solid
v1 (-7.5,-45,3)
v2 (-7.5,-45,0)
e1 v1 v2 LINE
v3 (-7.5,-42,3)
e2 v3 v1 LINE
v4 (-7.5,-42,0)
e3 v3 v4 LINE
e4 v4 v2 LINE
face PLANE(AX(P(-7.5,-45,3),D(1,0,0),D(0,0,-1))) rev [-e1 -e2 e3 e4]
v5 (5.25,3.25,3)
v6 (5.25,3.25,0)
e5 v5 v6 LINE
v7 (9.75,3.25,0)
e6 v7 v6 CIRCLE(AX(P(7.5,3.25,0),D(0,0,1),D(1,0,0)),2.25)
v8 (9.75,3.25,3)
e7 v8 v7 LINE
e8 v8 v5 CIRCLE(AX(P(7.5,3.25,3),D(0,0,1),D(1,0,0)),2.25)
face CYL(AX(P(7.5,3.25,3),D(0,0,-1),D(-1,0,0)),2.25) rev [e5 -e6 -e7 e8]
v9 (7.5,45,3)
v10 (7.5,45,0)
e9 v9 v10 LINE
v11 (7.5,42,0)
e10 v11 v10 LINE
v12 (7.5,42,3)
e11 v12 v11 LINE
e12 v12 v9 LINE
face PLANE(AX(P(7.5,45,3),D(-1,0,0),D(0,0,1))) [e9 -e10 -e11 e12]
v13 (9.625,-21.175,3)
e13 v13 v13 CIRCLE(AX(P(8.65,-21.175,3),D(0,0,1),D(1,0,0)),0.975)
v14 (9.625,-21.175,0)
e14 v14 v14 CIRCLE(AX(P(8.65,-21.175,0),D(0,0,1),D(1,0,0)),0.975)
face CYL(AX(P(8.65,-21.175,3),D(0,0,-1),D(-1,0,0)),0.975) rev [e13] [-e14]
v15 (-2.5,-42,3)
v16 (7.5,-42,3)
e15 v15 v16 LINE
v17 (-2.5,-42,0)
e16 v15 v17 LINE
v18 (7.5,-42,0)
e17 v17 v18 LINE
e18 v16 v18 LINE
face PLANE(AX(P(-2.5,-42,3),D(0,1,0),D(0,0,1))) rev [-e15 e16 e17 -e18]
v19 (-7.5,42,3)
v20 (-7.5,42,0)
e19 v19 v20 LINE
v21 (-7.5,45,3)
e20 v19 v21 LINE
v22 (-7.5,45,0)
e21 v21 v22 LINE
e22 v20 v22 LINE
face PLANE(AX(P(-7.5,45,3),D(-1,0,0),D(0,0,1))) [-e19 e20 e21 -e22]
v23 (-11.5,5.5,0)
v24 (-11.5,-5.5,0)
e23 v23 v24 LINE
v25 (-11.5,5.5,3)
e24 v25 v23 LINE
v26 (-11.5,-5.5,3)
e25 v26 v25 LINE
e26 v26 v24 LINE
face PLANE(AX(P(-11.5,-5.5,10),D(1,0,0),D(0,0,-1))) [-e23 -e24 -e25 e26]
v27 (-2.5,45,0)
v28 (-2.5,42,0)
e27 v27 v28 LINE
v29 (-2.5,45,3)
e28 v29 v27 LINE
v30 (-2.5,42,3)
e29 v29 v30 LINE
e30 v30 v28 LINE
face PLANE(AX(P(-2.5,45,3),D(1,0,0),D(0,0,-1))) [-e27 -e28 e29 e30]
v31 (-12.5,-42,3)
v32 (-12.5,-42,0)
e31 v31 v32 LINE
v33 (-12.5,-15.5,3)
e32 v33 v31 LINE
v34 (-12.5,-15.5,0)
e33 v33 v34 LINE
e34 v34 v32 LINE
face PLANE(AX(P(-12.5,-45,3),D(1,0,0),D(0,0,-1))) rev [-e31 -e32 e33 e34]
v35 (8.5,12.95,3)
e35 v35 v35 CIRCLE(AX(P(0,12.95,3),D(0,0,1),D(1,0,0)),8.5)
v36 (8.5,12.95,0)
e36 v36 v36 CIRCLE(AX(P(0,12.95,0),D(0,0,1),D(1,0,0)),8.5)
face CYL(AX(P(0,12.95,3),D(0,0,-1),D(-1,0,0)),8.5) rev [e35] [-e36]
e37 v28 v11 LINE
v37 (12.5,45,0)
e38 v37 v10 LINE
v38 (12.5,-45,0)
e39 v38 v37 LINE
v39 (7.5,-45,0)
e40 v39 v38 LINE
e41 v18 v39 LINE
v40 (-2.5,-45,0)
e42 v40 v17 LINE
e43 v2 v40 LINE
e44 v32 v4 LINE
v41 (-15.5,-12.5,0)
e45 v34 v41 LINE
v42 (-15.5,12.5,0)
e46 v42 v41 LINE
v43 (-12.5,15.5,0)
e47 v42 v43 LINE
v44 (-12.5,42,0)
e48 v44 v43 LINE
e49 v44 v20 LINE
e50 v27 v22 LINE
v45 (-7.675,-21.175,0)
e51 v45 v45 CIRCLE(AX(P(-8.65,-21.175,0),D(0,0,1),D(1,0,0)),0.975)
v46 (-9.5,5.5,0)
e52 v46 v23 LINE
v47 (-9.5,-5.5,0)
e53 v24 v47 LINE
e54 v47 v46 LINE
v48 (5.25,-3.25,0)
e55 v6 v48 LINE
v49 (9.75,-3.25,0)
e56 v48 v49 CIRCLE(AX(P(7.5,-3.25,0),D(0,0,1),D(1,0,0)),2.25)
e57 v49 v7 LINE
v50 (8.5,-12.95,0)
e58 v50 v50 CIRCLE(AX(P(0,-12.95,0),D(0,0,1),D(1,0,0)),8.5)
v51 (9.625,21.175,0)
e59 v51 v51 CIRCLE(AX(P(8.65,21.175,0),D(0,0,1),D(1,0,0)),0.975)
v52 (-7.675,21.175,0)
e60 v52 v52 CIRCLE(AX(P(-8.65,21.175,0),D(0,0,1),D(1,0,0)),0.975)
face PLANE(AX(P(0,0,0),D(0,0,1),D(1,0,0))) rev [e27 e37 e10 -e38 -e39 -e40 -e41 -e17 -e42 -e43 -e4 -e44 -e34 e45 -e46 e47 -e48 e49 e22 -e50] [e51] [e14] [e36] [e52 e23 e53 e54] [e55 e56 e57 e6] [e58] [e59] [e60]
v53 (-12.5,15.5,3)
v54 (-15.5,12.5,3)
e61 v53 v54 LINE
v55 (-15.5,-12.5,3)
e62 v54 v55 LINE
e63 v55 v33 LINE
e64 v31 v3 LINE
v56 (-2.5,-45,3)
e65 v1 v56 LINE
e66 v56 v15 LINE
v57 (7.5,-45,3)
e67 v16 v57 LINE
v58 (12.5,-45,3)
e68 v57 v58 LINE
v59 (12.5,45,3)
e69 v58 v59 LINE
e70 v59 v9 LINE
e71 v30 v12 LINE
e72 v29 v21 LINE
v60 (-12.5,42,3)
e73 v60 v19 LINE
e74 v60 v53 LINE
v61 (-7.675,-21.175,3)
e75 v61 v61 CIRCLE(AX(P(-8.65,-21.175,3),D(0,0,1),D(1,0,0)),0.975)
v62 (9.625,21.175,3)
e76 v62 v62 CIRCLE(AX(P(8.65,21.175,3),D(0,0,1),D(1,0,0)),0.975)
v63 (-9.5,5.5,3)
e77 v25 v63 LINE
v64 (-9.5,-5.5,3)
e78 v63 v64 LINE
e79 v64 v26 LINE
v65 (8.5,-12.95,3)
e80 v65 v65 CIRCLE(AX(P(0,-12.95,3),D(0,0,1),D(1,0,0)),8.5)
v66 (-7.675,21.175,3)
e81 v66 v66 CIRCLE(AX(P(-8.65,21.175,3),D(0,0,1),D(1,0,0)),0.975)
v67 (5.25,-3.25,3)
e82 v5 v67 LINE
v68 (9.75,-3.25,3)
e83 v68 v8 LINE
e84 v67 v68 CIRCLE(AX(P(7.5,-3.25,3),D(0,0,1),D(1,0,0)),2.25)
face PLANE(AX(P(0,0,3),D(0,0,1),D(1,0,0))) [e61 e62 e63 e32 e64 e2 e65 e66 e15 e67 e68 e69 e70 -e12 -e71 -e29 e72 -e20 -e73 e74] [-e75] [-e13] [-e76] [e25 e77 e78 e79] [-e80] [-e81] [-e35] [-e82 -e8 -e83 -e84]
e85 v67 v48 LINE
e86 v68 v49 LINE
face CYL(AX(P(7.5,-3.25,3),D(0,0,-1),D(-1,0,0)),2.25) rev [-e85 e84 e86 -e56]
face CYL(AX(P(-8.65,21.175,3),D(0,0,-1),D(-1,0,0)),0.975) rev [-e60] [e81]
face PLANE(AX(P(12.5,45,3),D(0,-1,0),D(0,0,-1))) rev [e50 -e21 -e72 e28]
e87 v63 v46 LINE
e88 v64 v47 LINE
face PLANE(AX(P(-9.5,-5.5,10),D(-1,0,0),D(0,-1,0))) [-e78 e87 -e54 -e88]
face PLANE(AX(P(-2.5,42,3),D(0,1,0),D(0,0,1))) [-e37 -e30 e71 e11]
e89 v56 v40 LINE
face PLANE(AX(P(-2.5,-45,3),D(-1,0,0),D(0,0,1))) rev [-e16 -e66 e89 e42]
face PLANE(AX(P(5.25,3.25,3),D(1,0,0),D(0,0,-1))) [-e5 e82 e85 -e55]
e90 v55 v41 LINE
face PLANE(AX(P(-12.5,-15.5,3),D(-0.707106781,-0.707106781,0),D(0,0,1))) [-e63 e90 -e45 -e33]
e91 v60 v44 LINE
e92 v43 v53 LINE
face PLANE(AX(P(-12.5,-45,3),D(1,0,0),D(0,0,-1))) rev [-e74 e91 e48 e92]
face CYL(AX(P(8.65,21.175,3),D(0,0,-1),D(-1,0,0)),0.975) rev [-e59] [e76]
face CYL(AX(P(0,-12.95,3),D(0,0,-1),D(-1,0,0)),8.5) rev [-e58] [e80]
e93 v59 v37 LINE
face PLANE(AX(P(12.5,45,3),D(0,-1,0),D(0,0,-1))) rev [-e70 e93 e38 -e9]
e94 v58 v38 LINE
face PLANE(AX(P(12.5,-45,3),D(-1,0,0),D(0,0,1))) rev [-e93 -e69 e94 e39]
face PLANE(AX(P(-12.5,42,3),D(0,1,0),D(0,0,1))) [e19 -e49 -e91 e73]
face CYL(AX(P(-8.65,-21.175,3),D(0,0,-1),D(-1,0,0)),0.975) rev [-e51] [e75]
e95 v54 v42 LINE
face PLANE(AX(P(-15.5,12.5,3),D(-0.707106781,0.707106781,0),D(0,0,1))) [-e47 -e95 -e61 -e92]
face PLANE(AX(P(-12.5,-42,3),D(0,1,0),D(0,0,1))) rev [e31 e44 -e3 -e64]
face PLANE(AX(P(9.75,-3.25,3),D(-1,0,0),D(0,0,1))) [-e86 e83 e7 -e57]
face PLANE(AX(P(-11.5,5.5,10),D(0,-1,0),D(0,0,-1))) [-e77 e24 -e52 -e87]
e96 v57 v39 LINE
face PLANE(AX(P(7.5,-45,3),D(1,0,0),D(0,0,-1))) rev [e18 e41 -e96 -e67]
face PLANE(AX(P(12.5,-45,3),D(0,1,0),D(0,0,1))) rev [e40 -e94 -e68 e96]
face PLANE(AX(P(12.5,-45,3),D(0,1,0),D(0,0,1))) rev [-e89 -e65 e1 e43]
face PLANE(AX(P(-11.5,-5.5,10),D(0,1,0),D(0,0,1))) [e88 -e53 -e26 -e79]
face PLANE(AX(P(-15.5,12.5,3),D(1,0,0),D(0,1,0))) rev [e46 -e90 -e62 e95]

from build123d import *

# Parameters (mm, degrees)
CROQUIS2_W              = 25
CROQUIS2_H              = 90
SALIENTE_EXTRUIR1_DEPTH = 3
CROQUIS3_W              = 10
CROQUIS3_H              = 3
CROQUIS3_W_2            = 5
CORTAR_EXTRUIR1_DEPTH   = 47.800106837
CROQUIS5_R              = 8.5
CROQUIS5_R_2            = 0.975
CORTAR_EXTRUIR2_DEPTH   = 47.800106837
CROQUIS6_W              = 2
CROQUIS6_H              = 11
CORTAR_EXTRUIR3_DEPTH   = 10
CROQUIS7_W              = 3
CROQUIS7_H              = 25
SALIENTE_EXTRUIR2_DEPTH = 3
CHAFL_N1_SIZE           = 3


with BuildPart() as part:
    # Croquis2 → Saliente-Extruir1 (new body)
    with BuildSketch(Plane.XY):
        Rectangle(CROQUIS2_W, CROQUIS2_H)
    extrude(amount=SALIENTE_EXTRUIR1_DEPTH)

    # Croquis3 → Cortar-Extruir1 (cut, through all)
    with BuildSketch(Plane.XY):
        with Locations((2.5, 43.5)):
            Rectangle(CROQUIS3_W, CROQUIS3_H)
        with Locations((-10, 43.5)):
            Rectangle(CROQUIS3_W_2, CROQUIS3_H)
    cortar_extruir1 = extrude(amount=CORTAR_EXTRUIR1_DEPTH, mode=Mode.SUBTRACT)

    # Simetría2: Cortar-Extruir1 across plane
    add(cortar_extruir1.mirror(Plane.ZX), mode=Mode.SUBTRACT)

    # Croquis5 → Cortar-Extruir2 (cut, through all)
    with BuildSketch(Plane.XY):
        with Locations((0, 12.95)):
            Circle(CROQUIS5_R)
        with Locations((0, -12.95)):
            Circle(CROQUIS5_R)
        with Locations((-8.65, 21.175)):
            Circle(CROQUIS5_R_2)
        with Locations((8.65, 21.175)):
            Circle(CROQUIS5_R_2)
        with Locations((8.65, -21.175)):
            Circle(CROQUIS5_R_2)
        with Locations((-8.65, -21.175)):
            Circle(CROQUIS5_R_2)
        with BuildLine():
            Line((9.75, -3.25), (9.75, 3.25))
            ThreePointArc((9.75, 3.25), (7.5, 5.5), (5.25, 3.25))
            Line((5.25, 3.25), (5.25, -3.25))
            ThreePointArc((5.25, -3.25), (7.5, -5.5), (9.75, -3.25))
        make_face()
    extrude(amount=CORTAR_EXTRUIR2_DEPTH, mode=Mode.SUBTRACT)

    # Croquis6 → Cortar-Extruir3 (cut)
    with BuildSketch(Plane.XY):
        with Locations((-10.5, 0)):
            Rectangle(CROQUIS6_W, CROQUIS6_H)
    extrude(amount=CORTAR_EXTRUIR3_DEPTH, mode=Mode.SUBTRACT)

    # Croquis7 → Saliente-Extruir2 (add)
    with BuildSketch(Plane.XY):
        with Locations((-14, 0)):
            Rectangle(CROQUIS7_W, CROQUIS7_H)
    extrude(amount=SALIENTE_EXTRUIR2_DEPTH)

    # Chaflán1
    chafl_n1_edges = [part.edges().sort_by_distance(p)[0] for p in [
        (-12.5, -12.5, 1.5),
        (-12.5, 12.5, 1.5),
    ]]
    chamfer(chafl_n1_edges, length=CHAFL_N1_SIZE - 0.0001)  # a hair under: the kernel refuses the full size


solid = part.part
